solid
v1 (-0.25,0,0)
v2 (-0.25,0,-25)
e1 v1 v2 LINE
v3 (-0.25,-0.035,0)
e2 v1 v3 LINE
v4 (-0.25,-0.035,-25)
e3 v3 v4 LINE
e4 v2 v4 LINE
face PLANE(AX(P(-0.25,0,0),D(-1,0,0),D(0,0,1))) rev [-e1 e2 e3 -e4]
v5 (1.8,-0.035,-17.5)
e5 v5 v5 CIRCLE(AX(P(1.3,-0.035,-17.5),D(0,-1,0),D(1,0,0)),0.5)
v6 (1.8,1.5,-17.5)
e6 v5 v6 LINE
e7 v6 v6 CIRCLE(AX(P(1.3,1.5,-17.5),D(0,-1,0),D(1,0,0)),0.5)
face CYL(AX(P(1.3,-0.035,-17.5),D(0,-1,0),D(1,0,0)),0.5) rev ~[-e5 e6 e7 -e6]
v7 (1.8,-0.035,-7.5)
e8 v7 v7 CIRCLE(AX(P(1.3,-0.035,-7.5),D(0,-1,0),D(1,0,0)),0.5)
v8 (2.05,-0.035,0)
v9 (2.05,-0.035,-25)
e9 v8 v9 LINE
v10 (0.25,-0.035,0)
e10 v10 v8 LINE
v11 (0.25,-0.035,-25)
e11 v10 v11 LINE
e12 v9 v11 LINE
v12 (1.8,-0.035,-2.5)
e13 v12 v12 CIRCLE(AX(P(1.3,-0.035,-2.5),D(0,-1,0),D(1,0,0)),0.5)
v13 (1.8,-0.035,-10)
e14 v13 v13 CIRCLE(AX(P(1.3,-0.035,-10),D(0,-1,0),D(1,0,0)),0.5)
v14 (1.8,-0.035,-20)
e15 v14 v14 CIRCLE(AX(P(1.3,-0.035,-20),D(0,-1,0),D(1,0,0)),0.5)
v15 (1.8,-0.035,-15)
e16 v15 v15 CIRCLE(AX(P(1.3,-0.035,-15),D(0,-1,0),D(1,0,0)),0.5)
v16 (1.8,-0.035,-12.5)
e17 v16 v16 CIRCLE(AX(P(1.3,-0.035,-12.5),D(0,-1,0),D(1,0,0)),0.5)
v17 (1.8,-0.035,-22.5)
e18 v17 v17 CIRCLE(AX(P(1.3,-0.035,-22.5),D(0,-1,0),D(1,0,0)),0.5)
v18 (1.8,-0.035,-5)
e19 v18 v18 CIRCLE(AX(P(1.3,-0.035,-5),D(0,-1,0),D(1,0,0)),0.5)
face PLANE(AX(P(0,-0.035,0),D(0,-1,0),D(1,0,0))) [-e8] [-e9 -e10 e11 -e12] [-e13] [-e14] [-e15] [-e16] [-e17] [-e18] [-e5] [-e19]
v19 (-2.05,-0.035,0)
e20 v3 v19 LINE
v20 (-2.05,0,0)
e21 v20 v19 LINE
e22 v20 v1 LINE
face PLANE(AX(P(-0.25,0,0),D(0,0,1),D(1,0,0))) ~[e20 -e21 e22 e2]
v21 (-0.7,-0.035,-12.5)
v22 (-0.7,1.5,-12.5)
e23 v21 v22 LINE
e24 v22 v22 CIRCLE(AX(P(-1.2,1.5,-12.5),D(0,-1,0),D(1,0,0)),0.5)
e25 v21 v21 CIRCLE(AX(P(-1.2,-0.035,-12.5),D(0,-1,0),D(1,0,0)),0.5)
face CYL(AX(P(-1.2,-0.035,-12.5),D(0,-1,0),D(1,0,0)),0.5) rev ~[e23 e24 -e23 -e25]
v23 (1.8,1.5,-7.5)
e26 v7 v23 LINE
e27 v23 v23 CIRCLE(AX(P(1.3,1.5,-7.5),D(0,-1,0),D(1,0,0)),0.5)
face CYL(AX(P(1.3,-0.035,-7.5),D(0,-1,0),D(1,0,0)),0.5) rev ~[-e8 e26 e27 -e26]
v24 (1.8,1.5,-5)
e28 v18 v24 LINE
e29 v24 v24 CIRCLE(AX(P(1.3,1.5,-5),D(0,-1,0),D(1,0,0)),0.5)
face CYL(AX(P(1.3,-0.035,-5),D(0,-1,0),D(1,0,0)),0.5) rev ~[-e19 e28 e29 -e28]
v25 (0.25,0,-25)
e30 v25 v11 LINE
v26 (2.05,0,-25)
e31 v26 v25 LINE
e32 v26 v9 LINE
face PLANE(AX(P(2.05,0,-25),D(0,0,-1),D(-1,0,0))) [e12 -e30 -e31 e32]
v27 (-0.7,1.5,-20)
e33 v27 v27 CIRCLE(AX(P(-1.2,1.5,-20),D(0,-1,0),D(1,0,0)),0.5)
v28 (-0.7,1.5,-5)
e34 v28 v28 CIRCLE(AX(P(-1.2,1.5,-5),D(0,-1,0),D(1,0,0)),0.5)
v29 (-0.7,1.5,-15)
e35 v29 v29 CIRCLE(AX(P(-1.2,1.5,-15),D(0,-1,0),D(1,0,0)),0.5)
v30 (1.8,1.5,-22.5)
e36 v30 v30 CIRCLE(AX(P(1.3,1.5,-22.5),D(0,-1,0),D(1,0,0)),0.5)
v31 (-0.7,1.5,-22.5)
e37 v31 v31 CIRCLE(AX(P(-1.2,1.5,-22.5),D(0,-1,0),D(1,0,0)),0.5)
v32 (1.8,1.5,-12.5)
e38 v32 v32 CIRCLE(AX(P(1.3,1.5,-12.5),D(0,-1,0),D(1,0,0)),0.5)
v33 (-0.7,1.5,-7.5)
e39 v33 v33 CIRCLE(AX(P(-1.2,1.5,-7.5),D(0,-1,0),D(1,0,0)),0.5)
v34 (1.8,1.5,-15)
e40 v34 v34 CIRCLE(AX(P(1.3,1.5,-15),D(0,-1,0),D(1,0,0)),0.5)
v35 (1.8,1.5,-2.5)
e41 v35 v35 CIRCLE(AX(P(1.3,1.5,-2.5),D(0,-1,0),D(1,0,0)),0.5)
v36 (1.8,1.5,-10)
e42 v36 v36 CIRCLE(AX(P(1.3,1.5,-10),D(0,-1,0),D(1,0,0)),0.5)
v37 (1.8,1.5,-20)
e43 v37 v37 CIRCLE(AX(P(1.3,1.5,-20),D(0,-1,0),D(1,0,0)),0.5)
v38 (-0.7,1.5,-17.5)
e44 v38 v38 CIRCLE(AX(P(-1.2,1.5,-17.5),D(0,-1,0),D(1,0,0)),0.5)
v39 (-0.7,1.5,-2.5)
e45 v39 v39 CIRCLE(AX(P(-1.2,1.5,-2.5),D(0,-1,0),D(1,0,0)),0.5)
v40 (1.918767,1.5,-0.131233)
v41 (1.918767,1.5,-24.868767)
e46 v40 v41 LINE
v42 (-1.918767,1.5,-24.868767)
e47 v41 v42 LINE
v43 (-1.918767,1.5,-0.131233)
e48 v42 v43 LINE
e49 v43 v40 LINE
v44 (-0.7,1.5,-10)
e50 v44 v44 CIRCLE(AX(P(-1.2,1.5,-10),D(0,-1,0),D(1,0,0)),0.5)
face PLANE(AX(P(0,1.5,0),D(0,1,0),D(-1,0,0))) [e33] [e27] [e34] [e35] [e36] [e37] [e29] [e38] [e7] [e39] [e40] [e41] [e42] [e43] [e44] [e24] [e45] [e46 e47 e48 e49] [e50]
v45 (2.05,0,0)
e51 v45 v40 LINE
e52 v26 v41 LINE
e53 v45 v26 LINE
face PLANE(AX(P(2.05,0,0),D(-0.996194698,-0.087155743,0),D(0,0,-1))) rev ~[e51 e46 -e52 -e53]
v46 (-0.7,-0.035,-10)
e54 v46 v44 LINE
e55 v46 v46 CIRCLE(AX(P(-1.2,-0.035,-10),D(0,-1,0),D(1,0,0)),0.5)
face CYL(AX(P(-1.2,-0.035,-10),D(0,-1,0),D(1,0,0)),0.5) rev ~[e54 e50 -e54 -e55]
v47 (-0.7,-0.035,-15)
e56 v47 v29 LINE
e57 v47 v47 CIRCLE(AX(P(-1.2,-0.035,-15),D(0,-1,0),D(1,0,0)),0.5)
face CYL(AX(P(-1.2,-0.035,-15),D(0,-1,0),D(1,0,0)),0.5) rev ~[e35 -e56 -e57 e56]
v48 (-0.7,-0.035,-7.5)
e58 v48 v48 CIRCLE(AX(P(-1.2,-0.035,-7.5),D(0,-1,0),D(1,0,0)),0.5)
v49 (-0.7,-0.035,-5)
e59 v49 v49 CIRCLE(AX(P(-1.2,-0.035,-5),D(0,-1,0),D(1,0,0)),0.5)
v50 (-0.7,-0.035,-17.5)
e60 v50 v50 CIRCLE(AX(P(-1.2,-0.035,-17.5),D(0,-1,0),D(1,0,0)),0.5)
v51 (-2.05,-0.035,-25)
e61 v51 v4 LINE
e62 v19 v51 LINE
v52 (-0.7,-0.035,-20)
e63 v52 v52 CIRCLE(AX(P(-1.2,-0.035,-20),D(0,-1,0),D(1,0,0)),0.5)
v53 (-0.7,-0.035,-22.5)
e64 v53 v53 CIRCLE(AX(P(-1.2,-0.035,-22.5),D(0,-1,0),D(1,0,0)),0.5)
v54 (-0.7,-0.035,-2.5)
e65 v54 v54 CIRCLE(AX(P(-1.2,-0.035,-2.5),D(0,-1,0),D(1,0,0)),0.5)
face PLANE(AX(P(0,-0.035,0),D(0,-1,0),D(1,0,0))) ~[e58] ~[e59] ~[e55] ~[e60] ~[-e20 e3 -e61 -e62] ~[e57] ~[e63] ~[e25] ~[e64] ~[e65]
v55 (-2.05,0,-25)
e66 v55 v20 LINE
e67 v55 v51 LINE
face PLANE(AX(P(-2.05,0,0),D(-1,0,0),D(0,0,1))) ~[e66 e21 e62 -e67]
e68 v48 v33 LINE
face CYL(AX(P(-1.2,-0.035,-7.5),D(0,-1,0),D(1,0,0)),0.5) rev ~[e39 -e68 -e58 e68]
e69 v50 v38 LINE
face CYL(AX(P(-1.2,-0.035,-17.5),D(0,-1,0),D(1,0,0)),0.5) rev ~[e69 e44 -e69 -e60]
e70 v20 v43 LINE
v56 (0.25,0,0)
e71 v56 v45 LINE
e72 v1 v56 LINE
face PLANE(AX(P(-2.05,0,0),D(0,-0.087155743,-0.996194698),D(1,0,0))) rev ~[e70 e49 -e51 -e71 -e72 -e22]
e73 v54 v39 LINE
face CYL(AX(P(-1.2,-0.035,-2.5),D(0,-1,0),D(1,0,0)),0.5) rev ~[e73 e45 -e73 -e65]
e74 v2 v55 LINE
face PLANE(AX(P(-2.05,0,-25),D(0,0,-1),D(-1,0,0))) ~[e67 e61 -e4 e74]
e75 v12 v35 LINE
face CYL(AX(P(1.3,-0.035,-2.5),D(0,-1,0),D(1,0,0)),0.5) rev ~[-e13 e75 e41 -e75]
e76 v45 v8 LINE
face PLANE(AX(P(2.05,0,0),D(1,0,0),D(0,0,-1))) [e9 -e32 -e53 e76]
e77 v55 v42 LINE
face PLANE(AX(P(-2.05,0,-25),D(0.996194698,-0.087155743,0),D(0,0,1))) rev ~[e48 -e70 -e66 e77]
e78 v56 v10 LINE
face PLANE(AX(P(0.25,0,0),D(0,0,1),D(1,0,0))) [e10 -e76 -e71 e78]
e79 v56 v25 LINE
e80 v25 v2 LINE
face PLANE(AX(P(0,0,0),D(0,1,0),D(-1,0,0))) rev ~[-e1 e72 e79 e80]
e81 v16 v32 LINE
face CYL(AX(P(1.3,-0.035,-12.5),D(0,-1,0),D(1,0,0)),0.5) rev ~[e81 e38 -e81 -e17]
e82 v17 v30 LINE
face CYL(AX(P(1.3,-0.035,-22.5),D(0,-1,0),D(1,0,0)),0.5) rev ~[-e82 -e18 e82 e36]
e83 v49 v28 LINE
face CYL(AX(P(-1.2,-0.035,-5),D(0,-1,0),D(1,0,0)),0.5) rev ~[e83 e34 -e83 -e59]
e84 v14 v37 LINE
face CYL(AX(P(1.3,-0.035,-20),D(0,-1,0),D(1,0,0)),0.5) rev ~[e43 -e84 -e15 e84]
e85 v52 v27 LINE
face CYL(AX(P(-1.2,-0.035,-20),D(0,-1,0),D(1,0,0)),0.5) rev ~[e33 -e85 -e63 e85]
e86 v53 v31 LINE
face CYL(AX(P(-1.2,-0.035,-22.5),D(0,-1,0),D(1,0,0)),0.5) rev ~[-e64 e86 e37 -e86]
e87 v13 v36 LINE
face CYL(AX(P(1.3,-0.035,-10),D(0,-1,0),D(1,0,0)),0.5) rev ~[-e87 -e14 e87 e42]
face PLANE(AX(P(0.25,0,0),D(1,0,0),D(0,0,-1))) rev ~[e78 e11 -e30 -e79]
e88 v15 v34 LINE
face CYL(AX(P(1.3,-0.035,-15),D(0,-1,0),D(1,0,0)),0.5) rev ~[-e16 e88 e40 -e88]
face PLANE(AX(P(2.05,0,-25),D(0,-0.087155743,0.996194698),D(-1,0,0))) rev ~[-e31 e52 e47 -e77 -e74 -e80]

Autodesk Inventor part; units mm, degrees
ref_plane "YZ Plane" through (0, 0, 0) normal (1, 0, 0) x (0, 1, 0)
ref_plane "XZ Plane" through (0, 0, 0) normal (0, 1, 0) x (-1, 0, 0)
ref_plane "XY Plane" through (0, 0, 0) normal (0, 0, 1) x (1, 0, 0)
sketch "Sketch1" plane through (0, 0, 0) normal (0, 0, 1) x (1, 0, 0)
  point P0 (0, 0)
sketch "Sketch2" plane through (0, 0, 0) normal (0, 1, 0) x (-1, 0, 0)
  line L0 (2.87, 0) -> (-2.87, 0) projected
  line L1 (0, -30) -> (0, 5) projected
  line L2 (2.05, 0) -> (-2.05, 0)
  line L3 (-2.05, 0) -> (-2.05, -25)
  line L4 (-2.05, -25) -> (2.05, -25)
  line L5 (2.05, -25) -> (2.05, 0)
  point P0 (0, 0)
  dimension "d0" = 4.1
  dimension "d1" = 25
sketch "Sketch2 outline for Extrusion1" plane through (0, 0, 0) normal (0, 1, 0) x (-1, 0, 0)
  line L0 (2.05, -25) -> (2.05, 0)
  line L1 (-2.05, -25) -> (2.05, -25)
  line L2 (-2.05, 0) -> (-2.05, -25)
  line L3 (2.05, 0) -> (-2.05, 0)
extrude "Extrusion1" add sketch "Sketch2 outline for Extrusion1" along normal blind 1.5 draft -5
sketch "Sketch3" plane through (0, 0, 0) normal (0, -1, 0) x (1, 0, 0)
  line L0 (-2.05, 0) -> (2.05, 0) projected
  line L1 (-2.05, -25) -> (-2.05, 0) projected
  line L2 (2.05, -25) -> (-2.05, -25) projected
  line L3 (2.05, 0) -> (2.05, -25) projected
  line L4 (-2.87, 0) -> (2.87, 0) projected
  line L5 (0, -30) -> (0, 5) projected
  line L6 (-2.05, 0) -> (2.05, 0) projected
  line L7 (2.05, 0) -> (0.25, 0)
  line L8 (0.25, 0) -> (0.25, -25)
  line L9 (0.25, -25) -> (2.05, -25)
  line L10 (2.05, -25) -> (2.05, 0)
  point P0 (0, 0)
  point P1 (0.25, 0)
  dimension "d4" = 1.8
extrude "Extrusion2" add sketch "Sketch3" along normal blind 0.035 contours L0 L3 L2 L8
mirror "Mirror1" about plane through (0, 0, 0) normal (1, 0, 0) of "Extrusion2"
sketch "Sketch4" plane through (0, -0.035, 0) normal (0, -1, 0) x (1, 0, 0)
  circle A0 centre (1.3, -2.5) radius 0.5
  line L0 (2.05, 0) -> (0.25, 0) projected
  line L1 (2.05, -25) -> (2.05, 0) projected
  point P0 (0, 0)
  dimension "d7" = 1
  dimension "d8" = 2.5
  dimension "d9" = 0.75
extrude "Extrusion3" cut sketch "Sketch4" against normal through all
pattern_linear "Rectangular Pattern1" count 9 spacing 2.5 along (0, 0, -1) count 2 spacing 2.5 along (-1, 0, 0) of "Extrusion3"
equation "\"BendRadius\" = Thickness"
equation "\"BendReliefWidth\" = Thickness"
equation "\"BendReliefDepth\" = 0.5 * Thickness"
equation "\"CornerReliefSize\" = 4 * Thickness"
equation "\"MinimumRemnant\" = 2 * Thickness"
equation "\"TransitionRadius\" = BendRadius"
equation "\"JacobiRadiusSize\" = BendRadius"
equation "\"GapSize\" = Thickness"
equation "\"Thickness\" = 3.048"
properties part number "VeroBoardLeadsSIngleHeater"
